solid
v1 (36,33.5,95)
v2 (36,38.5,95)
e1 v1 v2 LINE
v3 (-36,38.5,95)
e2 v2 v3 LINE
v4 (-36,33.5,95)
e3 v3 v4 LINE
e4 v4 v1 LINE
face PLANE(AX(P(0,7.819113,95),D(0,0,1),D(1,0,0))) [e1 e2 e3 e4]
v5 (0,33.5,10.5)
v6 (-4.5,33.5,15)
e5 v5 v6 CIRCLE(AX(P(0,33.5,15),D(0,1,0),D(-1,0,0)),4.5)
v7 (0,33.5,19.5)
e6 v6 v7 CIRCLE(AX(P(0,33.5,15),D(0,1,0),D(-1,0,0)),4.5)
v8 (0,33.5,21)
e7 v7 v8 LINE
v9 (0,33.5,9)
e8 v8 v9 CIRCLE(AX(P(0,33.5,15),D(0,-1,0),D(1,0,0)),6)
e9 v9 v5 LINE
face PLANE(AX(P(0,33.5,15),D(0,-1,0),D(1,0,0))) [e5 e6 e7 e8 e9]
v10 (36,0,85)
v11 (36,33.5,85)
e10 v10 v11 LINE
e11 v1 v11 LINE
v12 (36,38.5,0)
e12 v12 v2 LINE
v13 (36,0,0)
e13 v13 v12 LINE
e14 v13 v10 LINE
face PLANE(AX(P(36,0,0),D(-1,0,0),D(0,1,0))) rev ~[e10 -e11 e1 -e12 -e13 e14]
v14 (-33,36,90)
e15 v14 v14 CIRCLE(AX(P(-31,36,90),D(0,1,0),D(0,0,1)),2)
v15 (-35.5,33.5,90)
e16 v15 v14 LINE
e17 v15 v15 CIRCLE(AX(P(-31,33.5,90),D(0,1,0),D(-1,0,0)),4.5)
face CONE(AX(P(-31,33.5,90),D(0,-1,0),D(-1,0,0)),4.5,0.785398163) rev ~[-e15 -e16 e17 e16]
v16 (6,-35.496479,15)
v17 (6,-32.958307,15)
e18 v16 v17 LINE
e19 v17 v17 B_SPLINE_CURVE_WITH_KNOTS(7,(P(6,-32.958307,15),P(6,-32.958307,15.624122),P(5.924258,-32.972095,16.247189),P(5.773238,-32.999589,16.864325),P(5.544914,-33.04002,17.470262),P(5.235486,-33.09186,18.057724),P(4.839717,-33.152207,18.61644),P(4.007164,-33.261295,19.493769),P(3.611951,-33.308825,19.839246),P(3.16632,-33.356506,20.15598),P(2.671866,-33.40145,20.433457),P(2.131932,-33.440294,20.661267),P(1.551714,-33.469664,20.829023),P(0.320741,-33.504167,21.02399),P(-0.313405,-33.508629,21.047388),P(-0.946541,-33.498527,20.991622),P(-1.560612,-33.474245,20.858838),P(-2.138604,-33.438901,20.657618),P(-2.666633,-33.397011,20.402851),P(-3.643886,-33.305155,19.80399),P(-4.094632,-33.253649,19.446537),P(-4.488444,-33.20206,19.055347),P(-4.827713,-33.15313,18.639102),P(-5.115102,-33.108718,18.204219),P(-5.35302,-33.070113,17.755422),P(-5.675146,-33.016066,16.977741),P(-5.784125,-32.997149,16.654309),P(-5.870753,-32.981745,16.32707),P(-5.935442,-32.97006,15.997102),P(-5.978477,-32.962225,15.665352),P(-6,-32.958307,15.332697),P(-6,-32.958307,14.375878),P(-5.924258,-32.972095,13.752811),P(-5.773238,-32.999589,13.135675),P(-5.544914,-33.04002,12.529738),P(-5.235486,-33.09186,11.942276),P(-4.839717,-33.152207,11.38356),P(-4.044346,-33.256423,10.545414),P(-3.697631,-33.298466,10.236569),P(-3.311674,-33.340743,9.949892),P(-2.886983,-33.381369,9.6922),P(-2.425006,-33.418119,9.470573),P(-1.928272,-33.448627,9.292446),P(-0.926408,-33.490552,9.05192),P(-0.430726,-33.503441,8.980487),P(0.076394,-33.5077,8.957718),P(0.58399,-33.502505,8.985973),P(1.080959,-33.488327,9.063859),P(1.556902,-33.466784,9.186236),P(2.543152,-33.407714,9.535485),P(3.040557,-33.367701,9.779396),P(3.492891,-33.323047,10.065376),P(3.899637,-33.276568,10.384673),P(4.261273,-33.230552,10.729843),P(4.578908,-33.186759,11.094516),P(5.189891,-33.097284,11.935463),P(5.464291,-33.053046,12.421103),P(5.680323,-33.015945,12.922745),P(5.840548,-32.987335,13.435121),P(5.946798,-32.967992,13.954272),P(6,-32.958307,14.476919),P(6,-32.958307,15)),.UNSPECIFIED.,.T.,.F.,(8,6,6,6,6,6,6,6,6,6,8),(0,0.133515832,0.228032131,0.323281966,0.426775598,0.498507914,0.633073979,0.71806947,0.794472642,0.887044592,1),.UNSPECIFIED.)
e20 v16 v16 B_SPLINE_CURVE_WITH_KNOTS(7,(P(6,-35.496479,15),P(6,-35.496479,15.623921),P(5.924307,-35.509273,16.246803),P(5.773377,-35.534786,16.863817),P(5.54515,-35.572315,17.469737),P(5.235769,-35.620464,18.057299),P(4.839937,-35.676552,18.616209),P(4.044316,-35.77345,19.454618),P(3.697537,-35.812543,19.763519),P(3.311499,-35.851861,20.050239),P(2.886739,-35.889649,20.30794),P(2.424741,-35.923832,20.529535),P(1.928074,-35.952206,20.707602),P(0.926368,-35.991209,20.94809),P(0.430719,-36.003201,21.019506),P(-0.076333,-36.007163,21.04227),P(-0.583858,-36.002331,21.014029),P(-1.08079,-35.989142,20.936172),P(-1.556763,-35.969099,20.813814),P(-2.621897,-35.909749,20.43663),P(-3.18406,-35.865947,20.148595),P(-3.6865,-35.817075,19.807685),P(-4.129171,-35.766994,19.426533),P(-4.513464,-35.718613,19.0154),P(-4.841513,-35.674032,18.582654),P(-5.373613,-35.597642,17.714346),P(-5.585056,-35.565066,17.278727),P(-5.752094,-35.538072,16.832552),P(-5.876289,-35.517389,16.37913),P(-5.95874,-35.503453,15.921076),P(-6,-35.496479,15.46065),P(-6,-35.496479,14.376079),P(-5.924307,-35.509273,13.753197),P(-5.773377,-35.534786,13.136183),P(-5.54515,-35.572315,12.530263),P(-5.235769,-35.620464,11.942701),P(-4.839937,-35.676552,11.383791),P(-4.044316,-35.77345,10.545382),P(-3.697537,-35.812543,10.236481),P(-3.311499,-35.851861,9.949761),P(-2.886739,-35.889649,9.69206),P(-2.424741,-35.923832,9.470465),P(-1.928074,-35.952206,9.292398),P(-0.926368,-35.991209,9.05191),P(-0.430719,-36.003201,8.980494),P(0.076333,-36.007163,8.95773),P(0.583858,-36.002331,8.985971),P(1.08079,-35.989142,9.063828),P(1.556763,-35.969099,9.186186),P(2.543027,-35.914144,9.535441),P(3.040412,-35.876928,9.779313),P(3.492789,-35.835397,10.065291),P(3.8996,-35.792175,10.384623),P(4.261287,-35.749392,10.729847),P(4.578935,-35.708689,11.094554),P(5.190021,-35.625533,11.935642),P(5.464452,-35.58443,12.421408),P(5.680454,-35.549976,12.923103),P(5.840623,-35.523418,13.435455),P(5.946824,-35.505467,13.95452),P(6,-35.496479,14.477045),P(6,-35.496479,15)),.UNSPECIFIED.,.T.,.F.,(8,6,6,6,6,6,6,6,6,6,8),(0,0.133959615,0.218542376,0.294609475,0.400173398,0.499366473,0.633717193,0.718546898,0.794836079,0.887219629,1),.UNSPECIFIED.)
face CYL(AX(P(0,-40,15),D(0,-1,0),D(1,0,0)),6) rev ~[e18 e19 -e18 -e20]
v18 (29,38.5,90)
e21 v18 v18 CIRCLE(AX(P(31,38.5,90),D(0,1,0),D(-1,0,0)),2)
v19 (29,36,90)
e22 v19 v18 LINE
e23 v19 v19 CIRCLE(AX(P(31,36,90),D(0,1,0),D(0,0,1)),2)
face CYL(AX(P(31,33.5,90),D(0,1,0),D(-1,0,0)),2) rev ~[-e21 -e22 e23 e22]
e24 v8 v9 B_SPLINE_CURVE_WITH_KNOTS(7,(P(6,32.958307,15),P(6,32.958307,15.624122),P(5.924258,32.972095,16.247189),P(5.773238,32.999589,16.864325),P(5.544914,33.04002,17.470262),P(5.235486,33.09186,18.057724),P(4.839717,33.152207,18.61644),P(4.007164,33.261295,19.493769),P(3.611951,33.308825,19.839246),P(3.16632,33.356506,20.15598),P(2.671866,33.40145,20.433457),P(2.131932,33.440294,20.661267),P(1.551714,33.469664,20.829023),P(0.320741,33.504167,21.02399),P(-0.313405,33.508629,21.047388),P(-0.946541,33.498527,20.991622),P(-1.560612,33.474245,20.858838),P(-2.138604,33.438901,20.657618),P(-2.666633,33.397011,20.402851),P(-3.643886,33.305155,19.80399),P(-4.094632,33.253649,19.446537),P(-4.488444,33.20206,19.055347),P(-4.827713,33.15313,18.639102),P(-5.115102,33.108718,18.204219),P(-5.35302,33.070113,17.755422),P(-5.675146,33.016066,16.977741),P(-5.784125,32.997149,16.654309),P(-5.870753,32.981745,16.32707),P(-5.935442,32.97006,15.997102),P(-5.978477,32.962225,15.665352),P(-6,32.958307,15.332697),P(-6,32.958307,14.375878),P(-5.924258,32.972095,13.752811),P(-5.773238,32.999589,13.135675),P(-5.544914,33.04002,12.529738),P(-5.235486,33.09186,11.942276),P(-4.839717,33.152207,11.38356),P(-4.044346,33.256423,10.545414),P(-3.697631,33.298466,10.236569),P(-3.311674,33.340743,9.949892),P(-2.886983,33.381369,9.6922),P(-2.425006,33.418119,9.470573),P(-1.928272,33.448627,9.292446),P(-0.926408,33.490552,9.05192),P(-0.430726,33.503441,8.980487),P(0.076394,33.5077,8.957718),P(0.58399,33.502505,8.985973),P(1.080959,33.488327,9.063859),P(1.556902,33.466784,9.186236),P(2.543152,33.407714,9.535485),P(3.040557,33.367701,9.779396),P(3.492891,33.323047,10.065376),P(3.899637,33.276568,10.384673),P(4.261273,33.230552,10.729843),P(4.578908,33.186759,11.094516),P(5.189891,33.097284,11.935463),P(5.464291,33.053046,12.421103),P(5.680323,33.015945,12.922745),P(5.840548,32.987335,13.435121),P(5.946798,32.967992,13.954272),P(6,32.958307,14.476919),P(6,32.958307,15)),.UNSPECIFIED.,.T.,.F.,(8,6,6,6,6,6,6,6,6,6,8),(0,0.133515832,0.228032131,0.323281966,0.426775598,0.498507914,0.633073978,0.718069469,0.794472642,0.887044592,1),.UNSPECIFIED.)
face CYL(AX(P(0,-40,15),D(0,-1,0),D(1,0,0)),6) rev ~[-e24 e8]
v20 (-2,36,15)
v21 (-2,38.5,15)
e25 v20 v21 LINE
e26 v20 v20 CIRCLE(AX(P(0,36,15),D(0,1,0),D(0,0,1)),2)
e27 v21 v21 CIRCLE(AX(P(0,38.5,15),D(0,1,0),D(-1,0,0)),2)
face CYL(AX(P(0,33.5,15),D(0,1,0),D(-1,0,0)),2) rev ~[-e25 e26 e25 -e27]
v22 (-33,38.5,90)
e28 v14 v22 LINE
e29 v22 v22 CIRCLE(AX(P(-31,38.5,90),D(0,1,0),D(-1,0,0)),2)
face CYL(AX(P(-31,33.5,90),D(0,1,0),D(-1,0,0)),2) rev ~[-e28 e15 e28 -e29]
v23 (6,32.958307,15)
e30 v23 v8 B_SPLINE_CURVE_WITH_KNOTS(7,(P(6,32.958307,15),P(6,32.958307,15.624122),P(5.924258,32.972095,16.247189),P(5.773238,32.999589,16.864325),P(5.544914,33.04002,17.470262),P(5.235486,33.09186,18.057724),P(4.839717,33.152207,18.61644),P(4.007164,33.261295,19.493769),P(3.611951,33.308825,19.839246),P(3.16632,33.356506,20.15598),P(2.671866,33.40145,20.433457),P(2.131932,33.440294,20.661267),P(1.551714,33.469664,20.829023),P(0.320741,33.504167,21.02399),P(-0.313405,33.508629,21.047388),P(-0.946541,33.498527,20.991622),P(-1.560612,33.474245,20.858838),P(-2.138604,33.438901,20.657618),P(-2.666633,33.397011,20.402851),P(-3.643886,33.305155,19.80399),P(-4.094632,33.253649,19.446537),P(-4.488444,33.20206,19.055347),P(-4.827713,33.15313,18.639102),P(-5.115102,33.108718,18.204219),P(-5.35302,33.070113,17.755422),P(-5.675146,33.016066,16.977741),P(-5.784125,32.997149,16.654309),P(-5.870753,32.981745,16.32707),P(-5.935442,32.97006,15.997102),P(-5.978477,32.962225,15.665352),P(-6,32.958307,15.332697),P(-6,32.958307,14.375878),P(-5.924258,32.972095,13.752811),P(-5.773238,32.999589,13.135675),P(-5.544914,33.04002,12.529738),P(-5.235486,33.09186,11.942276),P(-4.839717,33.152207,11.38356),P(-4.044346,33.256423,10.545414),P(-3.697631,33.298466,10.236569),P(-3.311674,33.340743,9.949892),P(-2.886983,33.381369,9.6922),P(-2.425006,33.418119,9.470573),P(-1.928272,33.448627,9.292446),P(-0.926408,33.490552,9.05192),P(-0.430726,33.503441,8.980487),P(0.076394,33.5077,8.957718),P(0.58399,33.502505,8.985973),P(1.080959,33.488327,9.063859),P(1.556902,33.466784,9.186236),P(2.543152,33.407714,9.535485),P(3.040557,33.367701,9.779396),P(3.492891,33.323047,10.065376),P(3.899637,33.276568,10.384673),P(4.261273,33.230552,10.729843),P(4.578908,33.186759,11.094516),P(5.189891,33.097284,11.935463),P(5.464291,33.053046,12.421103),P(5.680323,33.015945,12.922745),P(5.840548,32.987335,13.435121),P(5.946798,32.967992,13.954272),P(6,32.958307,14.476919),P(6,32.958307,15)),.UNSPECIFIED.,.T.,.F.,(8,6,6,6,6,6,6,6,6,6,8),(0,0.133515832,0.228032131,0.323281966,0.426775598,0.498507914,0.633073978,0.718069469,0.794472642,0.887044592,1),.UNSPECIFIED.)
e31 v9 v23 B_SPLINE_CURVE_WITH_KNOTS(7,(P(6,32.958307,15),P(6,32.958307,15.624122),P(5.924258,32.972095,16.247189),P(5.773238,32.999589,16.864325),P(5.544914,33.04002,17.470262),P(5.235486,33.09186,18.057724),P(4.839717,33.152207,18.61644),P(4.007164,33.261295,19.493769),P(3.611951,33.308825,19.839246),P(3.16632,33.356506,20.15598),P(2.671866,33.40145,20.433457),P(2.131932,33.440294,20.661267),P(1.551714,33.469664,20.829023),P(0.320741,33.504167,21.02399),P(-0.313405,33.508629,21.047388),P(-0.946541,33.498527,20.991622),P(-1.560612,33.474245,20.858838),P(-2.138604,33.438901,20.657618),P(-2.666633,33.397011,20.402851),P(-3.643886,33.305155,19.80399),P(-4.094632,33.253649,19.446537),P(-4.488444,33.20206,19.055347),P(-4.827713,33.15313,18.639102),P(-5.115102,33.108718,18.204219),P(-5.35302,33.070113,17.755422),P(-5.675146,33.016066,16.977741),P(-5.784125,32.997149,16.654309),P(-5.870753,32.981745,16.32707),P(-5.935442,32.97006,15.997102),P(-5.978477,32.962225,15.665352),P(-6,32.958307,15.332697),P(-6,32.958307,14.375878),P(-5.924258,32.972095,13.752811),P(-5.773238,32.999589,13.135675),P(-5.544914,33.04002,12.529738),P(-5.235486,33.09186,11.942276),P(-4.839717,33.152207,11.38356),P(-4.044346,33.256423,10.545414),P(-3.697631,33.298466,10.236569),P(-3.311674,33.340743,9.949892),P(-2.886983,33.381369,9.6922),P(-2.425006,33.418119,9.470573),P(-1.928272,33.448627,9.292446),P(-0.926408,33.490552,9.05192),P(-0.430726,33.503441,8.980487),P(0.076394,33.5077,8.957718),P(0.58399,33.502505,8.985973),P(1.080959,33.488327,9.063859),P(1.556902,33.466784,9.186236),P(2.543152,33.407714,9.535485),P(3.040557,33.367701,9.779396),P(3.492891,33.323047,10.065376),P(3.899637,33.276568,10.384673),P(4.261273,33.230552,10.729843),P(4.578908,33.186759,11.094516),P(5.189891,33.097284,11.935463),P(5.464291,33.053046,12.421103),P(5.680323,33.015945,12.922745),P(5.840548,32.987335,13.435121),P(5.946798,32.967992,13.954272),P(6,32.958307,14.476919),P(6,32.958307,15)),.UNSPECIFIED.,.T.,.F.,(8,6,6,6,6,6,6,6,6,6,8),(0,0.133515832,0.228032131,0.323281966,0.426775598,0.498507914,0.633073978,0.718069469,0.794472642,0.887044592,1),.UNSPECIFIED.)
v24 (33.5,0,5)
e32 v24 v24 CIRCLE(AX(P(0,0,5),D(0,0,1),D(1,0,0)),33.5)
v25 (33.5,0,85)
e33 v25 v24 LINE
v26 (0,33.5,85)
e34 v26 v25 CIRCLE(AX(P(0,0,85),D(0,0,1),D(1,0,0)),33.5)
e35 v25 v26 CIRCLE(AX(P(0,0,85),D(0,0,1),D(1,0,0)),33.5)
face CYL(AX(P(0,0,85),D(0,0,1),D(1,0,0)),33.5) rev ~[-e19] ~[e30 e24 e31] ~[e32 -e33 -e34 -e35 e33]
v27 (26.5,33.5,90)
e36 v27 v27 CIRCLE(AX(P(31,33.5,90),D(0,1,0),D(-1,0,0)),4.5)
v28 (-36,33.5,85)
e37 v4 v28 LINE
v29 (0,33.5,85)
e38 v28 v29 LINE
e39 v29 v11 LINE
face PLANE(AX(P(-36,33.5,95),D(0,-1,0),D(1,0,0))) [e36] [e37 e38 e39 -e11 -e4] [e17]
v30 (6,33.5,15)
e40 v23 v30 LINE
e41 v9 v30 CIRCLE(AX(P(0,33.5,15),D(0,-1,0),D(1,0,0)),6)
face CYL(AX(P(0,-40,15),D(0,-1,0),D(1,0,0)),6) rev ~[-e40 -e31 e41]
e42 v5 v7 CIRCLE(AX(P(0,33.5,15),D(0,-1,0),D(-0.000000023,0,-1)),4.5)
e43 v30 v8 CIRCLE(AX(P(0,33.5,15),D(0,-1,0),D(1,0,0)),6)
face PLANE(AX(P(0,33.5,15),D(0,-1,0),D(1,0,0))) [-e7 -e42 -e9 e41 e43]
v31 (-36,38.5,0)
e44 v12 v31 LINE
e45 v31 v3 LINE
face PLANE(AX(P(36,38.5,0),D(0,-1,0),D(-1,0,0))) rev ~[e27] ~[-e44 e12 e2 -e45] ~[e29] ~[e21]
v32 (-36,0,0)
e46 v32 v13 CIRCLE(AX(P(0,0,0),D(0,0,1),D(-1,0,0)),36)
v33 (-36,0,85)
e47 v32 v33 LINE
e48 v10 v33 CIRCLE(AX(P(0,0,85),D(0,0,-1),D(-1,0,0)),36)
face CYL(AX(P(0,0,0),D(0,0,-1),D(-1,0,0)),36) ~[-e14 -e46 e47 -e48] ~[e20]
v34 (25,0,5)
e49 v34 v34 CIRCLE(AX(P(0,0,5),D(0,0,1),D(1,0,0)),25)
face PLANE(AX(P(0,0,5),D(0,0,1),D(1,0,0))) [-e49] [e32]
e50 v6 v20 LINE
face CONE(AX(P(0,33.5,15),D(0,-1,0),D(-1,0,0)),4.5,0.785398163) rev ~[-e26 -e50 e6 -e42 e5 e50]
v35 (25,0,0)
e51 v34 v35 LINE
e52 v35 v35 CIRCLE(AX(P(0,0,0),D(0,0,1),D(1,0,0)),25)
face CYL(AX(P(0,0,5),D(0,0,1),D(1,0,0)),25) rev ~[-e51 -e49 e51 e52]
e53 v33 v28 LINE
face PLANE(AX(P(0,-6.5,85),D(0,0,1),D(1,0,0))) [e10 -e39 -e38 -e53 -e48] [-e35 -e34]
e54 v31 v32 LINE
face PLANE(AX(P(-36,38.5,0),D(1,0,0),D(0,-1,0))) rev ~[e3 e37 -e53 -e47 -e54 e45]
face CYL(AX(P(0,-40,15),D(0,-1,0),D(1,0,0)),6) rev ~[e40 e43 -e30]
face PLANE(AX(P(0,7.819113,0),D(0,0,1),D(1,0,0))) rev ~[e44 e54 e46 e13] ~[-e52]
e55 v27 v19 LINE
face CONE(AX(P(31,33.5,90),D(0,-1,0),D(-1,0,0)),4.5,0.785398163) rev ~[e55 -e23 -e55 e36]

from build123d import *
from build123d import SkipClean  # not in build123d's __all__

# Parameters (mm, degrees)
F1_DEPTH        = 95
F2_W            = 72
F2_H            = 80
F3_DEPTH        = 10
F4_R            = 33.5
F5_DEPTH        = 80
F7_D            = 4
F7_CSINK_D      = 9
F7_CSINK_ANGLE  = 90
F7_COPIES_COUNT = 2
F7_COPIES_PITCH = 81.154174
F8_R            = 25
F9_DEPTH        = 5.001
F11_R           = 6
F12_DEPTH       = 73.5


# Not quite as in the source:
# - a feature of the source that left no trace in its solid (it failed there, or was rolled back) is left out
# - a pattern or mirror of a feature is missing from the dataset's text; its kind, count and spacing are read off the source's solid


with BuildPart() as f1:
    # F0 (on Top) → F1 (new body)
    with BuildSketch(Plane.XY):
        with BuildLine():
            Line((36, 38.5), (-36, 38.5))
            Line((-36, 38.5), (-36, 0))
            ThreePointArc((-36, 0), (0, -36), (36, 0))
            Line((36, 0), (36, 38.5))
        make_face()
    extrude(amount=F1_DEPTH)

    # F2 (on face) → F3 (cut)
    with BuildSketch(Plane.XY.offset(95)):
        with Locations((0, -6.5)):
            Rectangle(F2_W, F2_H)
    extrude(amount=-F3_DEPTH, mode=Mode.SUBTRACT)

    # F4 (on face) → F5 (cut)
    with BuildSketch(Plane.XY.offset(85)):
        Circle(F4_R)
    extrude(amount=-F5_DEPTH, mode=Mode.SUBTRACT)

    # F7 (through all)
    with Locations(Plane.XZ.offset(-33.5)):
        with Locations((-31, 90), (31, 90)):
            f7 = CounterSinkHole(F7_D / 2, F7_CSINK_D / 2, counter_sink_angle=F7_CSINK_ANGLE)

    # F7_copies: F7 ×2
    with Locations(*[Vector(-0.3819889769, 0, -0.9241668797) * (i * F7_COPIES_PITCH) for i in range(1, F7_COPIES_COUNT)]):
        add(f7, clean=False, mode=Mode.SUBTRACT)

    # F8 (on face) → F9 (cut, through all)
    with BuildSketch(Plane.XY.offset(5)):
        Circle(F8_R)
    extrude(amount=-F9_DEPTH, mode=Mode.SUBTRACT)

    # F11 (on offset) → F12 (cut)
    with BuildSketch(Plane.XZ.offset(40)):
        with Locations((0, 15)):
            Circle(F11_R)
    with SkipClean():  # cleaning this boolean's faces spoils the solid; the shape is the same uncleaned
        extrude(amount=-F12_DEPTH, mode=Mode.SUBTRACT)


solid = f1.part
